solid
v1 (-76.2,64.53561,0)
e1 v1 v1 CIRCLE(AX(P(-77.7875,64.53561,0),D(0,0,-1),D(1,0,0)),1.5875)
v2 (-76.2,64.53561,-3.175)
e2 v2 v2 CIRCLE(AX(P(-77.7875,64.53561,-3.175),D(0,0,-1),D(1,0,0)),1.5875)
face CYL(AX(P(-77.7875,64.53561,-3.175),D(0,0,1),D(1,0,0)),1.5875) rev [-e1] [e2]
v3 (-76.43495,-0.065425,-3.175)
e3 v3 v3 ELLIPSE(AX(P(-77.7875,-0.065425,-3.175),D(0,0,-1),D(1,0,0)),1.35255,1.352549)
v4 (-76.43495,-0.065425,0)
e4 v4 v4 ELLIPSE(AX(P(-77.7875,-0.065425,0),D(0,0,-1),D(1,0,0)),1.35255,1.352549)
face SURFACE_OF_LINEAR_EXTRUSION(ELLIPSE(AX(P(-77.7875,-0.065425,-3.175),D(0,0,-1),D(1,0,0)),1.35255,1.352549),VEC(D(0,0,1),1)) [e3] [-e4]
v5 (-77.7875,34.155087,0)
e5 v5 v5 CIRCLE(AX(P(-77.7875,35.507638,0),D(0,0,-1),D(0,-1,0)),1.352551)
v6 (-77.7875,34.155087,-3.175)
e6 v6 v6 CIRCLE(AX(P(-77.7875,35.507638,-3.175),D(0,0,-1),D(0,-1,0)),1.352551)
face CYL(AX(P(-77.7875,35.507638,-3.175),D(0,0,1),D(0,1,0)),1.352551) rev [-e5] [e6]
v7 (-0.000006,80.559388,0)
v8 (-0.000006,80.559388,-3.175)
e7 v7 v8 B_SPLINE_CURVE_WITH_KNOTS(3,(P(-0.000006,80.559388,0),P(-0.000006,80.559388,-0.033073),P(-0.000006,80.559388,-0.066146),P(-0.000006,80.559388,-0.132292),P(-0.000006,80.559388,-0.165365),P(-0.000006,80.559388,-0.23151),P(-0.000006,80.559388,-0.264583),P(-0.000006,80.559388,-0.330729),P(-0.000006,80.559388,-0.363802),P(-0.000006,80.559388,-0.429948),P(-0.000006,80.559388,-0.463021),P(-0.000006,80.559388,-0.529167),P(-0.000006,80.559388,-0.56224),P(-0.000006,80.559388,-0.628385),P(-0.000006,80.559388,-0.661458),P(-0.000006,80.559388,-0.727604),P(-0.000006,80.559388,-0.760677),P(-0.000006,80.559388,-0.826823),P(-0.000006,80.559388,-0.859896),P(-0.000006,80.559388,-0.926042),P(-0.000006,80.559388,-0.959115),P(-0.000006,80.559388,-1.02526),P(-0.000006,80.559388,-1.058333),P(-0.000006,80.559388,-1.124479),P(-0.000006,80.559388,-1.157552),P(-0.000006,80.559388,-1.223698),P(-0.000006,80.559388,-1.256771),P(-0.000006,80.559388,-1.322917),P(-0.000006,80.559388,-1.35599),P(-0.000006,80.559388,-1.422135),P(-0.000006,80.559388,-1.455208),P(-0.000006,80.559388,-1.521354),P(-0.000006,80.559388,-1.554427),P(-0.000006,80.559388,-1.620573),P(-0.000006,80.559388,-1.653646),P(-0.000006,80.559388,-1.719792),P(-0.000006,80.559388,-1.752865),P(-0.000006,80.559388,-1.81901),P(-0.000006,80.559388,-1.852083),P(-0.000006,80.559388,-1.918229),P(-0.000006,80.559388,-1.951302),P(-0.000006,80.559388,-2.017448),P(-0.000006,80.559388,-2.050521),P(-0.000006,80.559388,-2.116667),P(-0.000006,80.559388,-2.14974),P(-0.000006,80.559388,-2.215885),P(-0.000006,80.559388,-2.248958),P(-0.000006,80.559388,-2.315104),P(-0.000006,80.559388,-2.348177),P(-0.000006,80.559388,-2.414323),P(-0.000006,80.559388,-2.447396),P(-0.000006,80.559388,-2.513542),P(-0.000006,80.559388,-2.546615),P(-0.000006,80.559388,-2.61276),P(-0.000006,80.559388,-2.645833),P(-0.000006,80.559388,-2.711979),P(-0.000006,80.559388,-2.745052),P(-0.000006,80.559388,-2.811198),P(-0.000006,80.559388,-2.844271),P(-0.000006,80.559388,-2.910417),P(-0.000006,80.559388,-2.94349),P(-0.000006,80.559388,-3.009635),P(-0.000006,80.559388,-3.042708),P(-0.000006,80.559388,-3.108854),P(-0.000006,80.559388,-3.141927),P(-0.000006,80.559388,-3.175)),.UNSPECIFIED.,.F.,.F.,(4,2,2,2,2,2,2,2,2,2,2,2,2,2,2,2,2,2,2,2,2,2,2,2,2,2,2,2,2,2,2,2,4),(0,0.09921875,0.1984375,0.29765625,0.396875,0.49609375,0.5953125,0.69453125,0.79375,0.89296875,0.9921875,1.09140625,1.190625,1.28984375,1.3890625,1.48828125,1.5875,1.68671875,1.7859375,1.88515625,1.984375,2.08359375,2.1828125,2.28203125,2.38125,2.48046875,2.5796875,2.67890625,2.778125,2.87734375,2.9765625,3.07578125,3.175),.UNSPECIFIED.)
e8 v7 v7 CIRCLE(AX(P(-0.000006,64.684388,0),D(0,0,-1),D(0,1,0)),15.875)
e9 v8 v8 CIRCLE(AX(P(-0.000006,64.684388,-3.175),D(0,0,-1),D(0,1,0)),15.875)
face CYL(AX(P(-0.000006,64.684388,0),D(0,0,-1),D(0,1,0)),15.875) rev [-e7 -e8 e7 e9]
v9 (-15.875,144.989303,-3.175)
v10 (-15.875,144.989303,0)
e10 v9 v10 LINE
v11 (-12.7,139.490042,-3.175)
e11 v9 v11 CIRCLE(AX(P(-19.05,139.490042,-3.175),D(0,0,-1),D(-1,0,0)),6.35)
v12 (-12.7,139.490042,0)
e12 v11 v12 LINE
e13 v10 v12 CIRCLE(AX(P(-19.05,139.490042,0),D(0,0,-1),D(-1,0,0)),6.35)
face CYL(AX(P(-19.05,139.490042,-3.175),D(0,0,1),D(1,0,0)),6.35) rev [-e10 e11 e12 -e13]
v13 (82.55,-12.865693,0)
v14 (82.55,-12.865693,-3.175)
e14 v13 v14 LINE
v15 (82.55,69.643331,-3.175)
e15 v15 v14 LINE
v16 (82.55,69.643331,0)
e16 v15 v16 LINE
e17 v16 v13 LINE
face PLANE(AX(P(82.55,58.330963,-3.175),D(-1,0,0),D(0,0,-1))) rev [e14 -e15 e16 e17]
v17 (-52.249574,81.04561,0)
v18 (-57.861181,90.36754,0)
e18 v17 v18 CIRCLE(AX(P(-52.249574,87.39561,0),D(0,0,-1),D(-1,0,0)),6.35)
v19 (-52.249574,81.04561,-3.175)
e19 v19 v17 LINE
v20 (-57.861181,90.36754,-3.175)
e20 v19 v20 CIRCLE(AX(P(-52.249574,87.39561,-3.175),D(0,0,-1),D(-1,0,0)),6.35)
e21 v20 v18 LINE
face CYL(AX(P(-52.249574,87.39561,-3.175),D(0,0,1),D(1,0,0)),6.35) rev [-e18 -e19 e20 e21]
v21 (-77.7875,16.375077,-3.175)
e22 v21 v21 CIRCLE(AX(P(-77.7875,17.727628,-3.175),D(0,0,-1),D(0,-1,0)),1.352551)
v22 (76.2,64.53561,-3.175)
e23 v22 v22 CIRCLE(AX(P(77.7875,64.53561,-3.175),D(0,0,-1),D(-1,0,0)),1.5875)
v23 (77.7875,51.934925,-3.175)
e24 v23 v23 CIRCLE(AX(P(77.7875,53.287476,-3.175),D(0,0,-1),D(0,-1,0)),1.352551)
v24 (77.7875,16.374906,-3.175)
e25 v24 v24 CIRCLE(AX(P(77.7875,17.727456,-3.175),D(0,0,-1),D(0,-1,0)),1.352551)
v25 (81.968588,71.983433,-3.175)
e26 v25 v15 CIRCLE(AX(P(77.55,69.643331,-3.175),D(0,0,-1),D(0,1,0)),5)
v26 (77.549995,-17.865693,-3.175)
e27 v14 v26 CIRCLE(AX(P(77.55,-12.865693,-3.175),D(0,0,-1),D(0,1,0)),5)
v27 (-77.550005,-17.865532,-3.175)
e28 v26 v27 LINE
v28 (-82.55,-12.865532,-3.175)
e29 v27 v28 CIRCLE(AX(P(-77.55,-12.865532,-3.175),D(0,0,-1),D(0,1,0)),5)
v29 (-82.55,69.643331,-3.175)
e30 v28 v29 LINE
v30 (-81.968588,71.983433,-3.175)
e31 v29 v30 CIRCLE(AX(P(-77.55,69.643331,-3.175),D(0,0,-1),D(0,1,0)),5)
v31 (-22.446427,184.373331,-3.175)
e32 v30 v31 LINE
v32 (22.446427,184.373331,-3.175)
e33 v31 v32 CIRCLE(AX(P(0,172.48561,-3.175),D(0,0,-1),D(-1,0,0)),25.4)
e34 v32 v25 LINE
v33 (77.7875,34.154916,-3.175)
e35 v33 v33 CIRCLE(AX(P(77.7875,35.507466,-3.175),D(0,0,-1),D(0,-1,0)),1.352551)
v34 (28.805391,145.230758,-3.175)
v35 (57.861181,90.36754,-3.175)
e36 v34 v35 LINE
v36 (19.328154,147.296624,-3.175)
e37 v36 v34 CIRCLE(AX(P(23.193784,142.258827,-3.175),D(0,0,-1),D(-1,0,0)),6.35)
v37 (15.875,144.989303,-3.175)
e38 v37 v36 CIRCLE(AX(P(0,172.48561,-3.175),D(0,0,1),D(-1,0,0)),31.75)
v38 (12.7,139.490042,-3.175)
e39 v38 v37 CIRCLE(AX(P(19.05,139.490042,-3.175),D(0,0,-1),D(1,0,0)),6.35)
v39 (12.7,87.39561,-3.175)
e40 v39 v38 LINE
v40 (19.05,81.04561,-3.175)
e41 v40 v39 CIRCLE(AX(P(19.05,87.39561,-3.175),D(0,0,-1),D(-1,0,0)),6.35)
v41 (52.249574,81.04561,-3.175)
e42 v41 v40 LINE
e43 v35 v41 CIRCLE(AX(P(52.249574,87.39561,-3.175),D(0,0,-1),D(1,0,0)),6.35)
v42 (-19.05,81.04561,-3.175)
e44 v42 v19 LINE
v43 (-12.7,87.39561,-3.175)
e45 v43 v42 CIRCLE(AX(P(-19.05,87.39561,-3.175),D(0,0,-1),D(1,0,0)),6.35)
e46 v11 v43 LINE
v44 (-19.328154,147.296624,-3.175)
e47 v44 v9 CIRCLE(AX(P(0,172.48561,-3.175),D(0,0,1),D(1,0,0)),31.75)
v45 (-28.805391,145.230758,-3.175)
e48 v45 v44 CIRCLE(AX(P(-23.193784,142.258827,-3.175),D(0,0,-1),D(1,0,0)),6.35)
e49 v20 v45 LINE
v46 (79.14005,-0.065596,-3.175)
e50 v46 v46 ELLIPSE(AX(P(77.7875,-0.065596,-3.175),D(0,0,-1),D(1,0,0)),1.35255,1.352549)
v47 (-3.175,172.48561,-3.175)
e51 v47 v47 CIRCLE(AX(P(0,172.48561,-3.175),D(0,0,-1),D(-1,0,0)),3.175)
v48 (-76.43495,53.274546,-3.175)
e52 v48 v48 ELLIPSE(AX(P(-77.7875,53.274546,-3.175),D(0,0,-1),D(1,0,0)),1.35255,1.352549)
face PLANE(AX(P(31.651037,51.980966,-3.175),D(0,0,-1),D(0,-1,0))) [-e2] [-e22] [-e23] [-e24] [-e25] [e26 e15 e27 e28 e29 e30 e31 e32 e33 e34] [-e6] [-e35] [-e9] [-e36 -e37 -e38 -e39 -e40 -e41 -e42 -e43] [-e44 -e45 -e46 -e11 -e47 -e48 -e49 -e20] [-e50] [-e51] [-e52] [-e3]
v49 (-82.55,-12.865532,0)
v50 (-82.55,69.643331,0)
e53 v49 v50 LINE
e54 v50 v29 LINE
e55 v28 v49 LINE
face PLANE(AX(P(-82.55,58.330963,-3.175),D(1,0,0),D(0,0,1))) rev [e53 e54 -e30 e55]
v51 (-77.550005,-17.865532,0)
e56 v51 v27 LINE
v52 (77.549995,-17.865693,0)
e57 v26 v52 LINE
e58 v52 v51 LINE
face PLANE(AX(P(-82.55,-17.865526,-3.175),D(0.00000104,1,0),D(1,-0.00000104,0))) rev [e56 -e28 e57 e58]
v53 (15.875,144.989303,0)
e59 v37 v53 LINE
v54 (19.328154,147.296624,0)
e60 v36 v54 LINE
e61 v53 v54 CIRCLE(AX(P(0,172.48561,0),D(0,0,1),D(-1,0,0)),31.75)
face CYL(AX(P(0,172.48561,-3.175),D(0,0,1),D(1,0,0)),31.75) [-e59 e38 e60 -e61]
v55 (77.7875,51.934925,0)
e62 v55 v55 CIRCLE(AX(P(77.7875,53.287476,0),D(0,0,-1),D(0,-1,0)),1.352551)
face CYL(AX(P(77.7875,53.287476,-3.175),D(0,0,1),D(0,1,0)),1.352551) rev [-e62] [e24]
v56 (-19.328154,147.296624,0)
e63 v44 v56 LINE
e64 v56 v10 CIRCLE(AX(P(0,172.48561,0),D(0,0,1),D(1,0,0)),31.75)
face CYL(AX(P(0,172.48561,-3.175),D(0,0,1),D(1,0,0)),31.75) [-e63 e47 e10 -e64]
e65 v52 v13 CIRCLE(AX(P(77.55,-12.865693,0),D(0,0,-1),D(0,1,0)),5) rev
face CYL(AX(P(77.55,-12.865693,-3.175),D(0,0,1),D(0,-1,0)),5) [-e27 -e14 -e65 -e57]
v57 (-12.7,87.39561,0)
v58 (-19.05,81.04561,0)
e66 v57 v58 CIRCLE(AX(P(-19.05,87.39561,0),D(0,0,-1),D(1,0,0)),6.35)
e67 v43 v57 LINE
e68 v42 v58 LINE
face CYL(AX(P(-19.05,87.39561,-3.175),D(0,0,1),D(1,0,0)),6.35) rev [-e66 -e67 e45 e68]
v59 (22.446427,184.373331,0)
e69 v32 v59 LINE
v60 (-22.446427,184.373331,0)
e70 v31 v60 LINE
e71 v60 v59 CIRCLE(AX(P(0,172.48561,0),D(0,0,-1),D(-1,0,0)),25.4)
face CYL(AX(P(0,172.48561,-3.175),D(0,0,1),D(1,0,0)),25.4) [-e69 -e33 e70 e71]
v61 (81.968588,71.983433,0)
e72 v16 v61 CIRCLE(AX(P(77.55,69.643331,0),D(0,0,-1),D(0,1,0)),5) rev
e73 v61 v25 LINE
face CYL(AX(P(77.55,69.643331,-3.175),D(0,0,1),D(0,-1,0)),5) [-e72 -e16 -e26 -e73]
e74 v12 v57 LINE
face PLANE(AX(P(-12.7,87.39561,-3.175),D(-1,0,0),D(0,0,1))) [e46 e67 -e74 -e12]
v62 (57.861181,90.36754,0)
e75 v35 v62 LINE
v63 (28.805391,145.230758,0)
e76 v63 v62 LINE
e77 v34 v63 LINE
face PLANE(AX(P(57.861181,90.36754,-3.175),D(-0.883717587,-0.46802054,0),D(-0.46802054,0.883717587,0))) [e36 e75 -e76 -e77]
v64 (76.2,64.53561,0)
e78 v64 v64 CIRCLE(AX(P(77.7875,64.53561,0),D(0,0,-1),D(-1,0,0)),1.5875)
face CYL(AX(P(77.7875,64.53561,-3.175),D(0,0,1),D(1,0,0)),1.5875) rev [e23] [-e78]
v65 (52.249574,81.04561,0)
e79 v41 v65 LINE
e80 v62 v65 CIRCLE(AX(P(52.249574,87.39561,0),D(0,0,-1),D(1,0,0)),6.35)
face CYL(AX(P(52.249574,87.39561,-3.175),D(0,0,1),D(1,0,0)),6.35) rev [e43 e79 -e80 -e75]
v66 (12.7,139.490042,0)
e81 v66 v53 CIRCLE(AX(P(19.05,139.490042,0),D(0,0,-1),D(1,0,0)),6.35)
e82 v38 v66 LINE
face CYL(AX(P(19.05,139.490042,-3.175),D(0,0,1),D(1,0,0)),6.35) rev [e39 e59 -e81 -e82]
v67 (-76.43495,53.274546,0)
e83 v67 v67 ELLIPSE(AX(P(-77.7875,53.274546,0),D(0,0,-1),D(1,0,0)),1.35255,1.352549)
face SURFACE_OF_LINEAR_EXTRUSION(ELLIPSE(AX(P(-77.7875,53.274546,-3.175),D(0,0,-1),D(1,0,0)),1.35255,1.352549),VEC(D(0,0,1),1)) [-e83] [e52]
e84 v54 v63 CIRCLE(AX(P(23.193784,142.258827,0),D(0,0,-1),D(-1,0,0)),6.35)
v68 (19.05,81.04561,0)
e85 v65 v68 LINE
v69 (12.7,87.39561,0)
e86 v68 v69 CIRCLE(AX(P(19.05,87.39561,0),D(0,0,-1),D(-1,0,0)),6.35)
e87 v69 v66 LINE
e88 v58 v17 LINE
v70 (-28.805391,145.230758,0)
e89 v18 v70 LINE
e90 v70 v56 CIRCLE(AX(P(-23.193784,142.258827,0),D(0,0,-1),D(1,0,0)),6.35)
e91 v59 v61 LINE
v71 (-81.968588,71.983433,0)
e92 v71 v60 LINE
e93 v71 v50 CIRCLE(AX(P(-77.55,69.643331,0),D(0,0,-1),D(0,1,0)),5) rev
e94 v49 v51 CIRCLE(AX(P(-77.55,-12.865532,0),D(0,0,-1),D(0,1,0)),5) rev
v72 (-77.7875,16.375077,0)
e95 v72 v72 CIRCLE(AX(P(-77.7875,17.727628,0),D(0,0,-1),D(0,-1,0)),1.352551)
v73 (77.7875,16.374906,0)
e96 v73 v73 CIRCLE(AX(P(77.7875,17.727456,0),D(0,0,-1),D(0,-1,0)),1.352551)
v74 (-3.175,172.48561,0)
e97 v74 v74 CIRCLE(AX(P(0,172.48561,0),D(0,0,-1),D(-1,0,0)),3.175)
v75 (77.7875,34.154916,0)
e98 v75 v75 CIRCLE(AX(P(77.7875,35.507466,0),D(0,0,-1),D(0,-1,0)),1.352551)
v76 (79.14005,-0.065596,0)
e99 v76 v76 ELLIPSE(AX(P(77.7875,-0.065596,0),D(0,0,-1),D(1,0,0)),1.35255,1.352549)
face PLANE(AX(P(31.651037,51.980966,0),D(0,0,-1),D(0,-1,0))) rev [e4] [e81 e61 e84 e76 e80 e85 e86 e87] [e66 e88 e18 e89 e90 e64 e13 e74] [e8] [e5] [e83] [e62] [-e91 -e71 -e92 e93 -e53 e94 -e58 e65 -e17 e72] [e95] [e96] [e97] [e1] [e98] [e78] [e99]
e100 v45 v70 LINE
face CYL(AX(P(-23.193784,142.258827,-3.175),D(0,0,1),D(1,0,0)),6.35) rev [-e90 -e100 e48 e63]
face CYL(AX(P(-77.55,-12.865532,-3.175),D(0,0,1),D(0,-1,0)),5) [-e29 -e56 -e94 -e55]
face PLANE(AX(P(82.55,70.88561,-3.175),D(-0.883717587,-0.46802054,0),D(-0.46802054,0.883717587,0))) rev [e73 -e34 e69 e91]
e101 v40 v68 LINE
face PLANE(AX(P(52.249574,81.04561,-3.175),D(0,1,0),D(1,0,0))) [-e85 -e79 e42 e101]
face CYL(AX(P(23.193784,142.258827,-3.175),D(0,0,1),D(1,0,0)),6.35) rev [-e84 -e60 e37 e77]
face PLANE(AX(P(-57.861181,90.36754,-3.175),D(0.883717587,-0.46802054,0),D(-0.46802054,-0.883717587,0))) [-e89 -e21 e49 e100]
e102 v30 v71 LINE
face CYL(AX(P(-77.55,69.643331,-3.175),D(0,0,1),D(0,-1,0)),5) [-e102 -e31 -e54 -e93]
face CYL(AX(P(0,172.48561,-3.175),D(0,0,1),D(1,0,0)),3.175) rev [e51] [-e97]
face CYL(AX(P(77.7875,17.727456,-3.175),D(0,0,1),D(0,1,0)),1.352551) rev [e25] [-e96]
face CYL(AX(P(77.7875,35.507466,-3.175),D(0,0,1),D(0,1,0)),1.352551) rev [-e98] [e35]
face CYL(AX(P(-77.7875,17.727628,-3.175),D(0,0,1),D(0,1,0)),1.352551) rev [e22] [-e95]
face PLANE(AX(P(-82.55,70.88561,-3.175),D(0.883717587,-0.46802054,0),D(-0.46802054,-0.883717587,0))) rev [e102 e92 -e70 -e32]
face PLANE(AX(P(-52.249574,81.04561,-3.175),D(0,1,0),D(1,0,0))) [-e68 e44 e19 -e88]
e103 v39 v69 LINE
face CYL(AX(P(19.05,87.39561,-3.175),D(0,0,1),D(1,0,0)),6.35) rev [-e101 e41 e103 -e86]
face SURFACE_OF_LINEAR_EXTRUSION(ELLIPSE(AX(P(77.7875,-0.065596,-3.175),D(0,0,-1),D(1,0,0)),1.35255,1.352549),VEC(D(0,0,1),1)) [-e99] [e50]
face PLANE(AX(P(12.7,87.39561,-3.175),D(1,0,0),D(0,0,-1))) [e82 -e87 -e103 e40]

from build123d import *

# Parameters (mm, degrees)
AM_1014_TI_PLATE_BOTTOM_1_AM_0001_ARTEME_START = -3.175
AM_1014_TI_PLATE_BOTTOM_1_AM_0001_AR_2_R       = 1.352550752
AM_1014_TI_PLATE_BOTTOM_1_AM_0001_AR_2_R_2     = 1.5875
AM_1014_TI_PLATE_BOTTOM_1_AM_0001_AR_2_R_3     = 3.175
AM_1014_TI_PLATE_BOTTOM_1_AM_0001_ARTEME_DEPTH = 3.175
BOSS_EXTRUDE1_DEPTH                            = 3.175
FILLET1_R                                      = 5
FILLET2_R                                      = 5
SKETCH3_R                                      = 15.875
CUT_EXTRUDE1_DEPTH                             = 215.437164916


# Read off the part's stored shape, not the designer's step: AM_1014_TI_PLATE_BOTTOM<1>@AM_0001_ARTEMECH
with BuildPart() as part:
    # AM_1014_TI_PLATE_BOTTOM_1_AM_0001_AR 2 → AM_1014_TI_PLATE_BOTTOM<1>@AM_0001_ARTEMECH (new body)
    with BuildSketch(Plane.XY.offset(AM_1014_TI_PLATE_BOTTOM_1_AM_0001_ARTEME_START)):
        with BuildLine():
            Line((82.55, -17.865698052), (82.55, 70.885609673))
            Line((82.55, 70.885609673), (22.446426721, 184.373331383))
            ThreePointArc((22.446426721, 184.373331383), (0, 197.885609673), (-22.446426721, 184.373331383))
            Line((-22.446426721, 184.373331383), (-82.55, 70.885609673))
            Line((-82.55, 70.885609673), (-82.55, -17.865526365))
            Line((-82.55, -17.865526365), (82.55, -17.865698052))
        make_face()
        with BuildLine():
            add(Edge.make_bspline(
                [(-76.43495, -0.065424583), (-76.43495, -2.408108601), (-78.463775, -1.236766592), (-80.4926, -0.065424583), (-78.463775, 1.105917426), (-76.43495, 2.277259435), (-76.43495, -0.065424583)],
                knots=[0, 0, 0, 2.094395102, 2.094395102, 4.188790205, 4.188790205, 6.283185307, 6.283185307, 6.283185307], degree=2, weights=[1, 0.5, 1, 0.5, 1, 0.5, 1]))
        make_face(mode=Mode.SUBTRACT)
        with Locations((-77.7875, 17.727628115)):
            Circle(AM_1014_TI_PLATE_BOTTOM_1_AM_0001_AR_2_R, mode=Mode.SUBTRACT)
        with Locations((-77.7875, 35.507637995)):
            Circle(AM_1014_TI_PLATE_BOTTOM_1_AM_0001_AR_2_R, mode=Mode.SUBTRACT)
        with BuildLine():
            add(Edge.make_bspline(
                [(-76.43495, 53.274545779), (-76.43495, 50.931861761), (-78.463775, 52.10320377), (-80.4926, 53.274545779), (-78.463775, 54.445887788), (-76.43495, 55.617229797), (-76.43495, 53.274545779)],
                knots=[0, 0, 0, 2.094395102, 2.094395102, 4.188790205, 4.188790205, 6.283185307, 6.283185307, 6.283185307], degree=2, weights=[1, 0.5, 1, 0.5, 1, 0.5, 1]))
        make_face(mode=Mode.SUBTRACT)
        with Locations((-77.7875, 64.535609673)):
            Circle(AM_1014_TI_PLATE_BOTTOM_1_AM_0001_AR_2_R_2, mode=Mode.SUBTRACT)
        with BuildLine():
            Line((-25.498963051, 42.455971326), (-25.498963051, 51.980966033))
            add(Edge.make_bspline(
                [(-27.992064204, 57.025448466), (-25.498963051, 55.119281003), (-25.498963051, 51.980966033)],
                knots=[5.365154464, 5.365154464, 5.365154464, 6.283185307, 6.283185307, 6.283185307], degree=2, weights=[1, 0.896489165, 1]))
            ThreePointArc((-27.992064204, 57.025448466), (-26.013795844, 54.758623994), (-25.301036949, 51.835609673))
            Line((-25.301036949, 51.835609673), (-25.301036949, 42.310609673))
            ThreePointArc((-25.301036949, 42.310609673), (-24.985888452, 40.931525054), (-24.103005841, 39.826214575))
            add(Edge.make_bspline(
                [(-25.498963051, 42.455971326), (-25.49896305, 40.770584495), (-24.103005841, 39.826214575)],
                knots=[0, 0, 0, 0.976013915, 0.976013915, 0.976013915], degree=2, weights=[1, 0.883269083, 1]))
        make_face(mode=Mode.SUBTRACT)
        with Locations((-21.166666667, 47.762966307)):
            Circle(AM_1014_TI_PLATE_BOTTOM_1_AM_0001_AR_2_R_2, mode=Mode.SUBTRACT)
        with BuildLine():
            ThreePointArc((-11.2, 77.174125728), (-9.5, 78.874125728), (-7.8, 77.174125728))
            Line((-7.8, 77.174125728), (-7.8, 64.474125728))
            ThreePointArc((-7.8, 64.474125728), (-9.5, 62.774125728), (-11.2, 64.474125728))
            Line((-11.2, 64.474125728), (-11.2, 77.174125728))
        make_face(mode=Mode.SUBTRACT)
        with BuildLine():
            ThreePointArc((-1.7, 85.174125728), (0, 86.874125728), (1.7, 85.174125728))
            Line((1.7, 85.174125728), (1.7, 56.474125728))
            ThreePointArc((1.7, 56.474125728), (0, 54.774125728), (-1.7, 56.474125728))
            Line((-1.7, 56.474125728), (-1.7, 85.174125728))
        make_face(mode=Mode.SUBTRACT)
        with BuildLine():
            add(Edge.make_bspline(
                [(79.14005, -0.065596271), (79.14005, -2.408280289), (77.111225, -1.23693828), (75.0824, -0.065596271), (77.111225, 1.105745738), (79.14005, 2.277087747), (79.14005, -0.065596271)],
                knots=[0, 0, 0, 2.094395102, 2.094395102, 4.188790205, 4.188790205, 6.283185307, 6.283185307, 6.283185307], degree=2, weights=[1, 0.5, 1, 0.5, 1, 0.5, 1]))
        make_face(mode=Mode.SUBTRACT)
        with Locations((77.7875, 17.727456427)):
            Circle(AM_1014_TI_PLATE_BOTTOM_1_AM_0001_AR_2_R, mode=Mode.SUBTRACT)
        with Locations((77.7875, 35.507466307)):
            Circle(AM_1014_TI_PLATE_BOTTOM_1_AM_0001_AR_2_R, mode=Mode.SUBTRACT)
        with Locations((21.166666667, 47.762966307)):
            Circle(AM_1014_TI_PLATE_BOTTOM_1_AM_0001_AR_2_R_2, mode=Mode.SUBTRACT)
        with BuildLine():
            ThreePointArc((7.8, 77.174125728), (9.5, 78.874125728), (11.2, 77.174125728))
            Line((11.2, 77.174125728), (11.2, 64.474125728))
            ThreePointArc((11.2, 64.474125728), (9.5, 62.774125728), (7.8, 64.474125728))
            Line((7.8, 64.474125728), (7.8, 77.174125728))
        make_face(mode=Mode.SUBTRACT)
        with Locations((77.7875, 53.287476186)):
            Circle(AM_1014_TI_PLATE_BOTTOM_1_AM_0001_AR_2_R, mode=Mode.SUBTRACT)
        with Locations((77.7875, 64.535609673)):
            Circle(AM_1014_TI_PLATE_BOTTOM_1_AM_0001_AR_2_R_2, mode=Mode.SUBTRACT)
        with BuildLine():
            ThreePointArc((-28.80539088, 145.230757697), (-24.546211379, 148.463135508), (-19.3281535, 147.296624336))
            ThreePointArc((-19.3281535, 147.296624336), (-17.639343437, 146.086441824), (-15.875, 144.989303103))
            ThreePointArc((-15.875, 144.989303103), (-13.550738686, 142.665041789), (-12.7, 139.490041789))
            Line((-12.7, 139.490041789), (-12.7, 87.395609673))
            ThreePointArc((-12.7, 87.395609673), (-14.559871939, 82.905481612), (-19.05, 81.045609673))
            Line((-19.05, 81.045609673), (-52.249574284, 81.045609673))
            ThreePointArc((-52.249574284, 81.045609673), (-57.689898641, 84.120648468), (-57.861180964, 90.3675401))
            Line((-57.861180964, 90.3675401), (-28.80539088, 145.230757697))
        make_face(mode=Mode.SUBTRACT)
        with Locations((0, 172.485609673)):
            Circle(AM_1014_TI_PLATE_BOTTOM_1_AM_0001_AR_2_R_3, mode=Mode.SUBTRACT)
        with BuildLine():
            ThreePointArc((12.7, 139.490041789), (13.550738686, 142.665041789), (15.875, 144.989303103))
            ThreePointArc((15.875, 144.989303103), (17.639343437, 146.086441824), (19.3281535, 147.296624336))
            ThreePointArc((19.3281535, 147.296624336), (24.546211379, 148.463135508), (28.80539088, 145.230757697))
            Line((28.80539088, 145.230757697), (57.861180964, 90.3675401))
            ThreePointArc((57.861180964, 90.3675401), (57.689898641, 84.120648468), (52.249574284, 81.045609673))
            Line((52.249574284, 81.045609673), (19.05, 81.045609673))
            ThreePointArc((19.05, 81.045609673), (14.559871939, 82.905481612), (12.7, 87.395609673))
            Line((12.7, 87.395609673), (12.7, 139.490041789))
        make_face(mode=Mode.SUBTRACT)
    extrude(amount=AM_1014_TI_PLATE_BOTTOM_1_AM_0001_ARTEME_DEPTH)

    # Sketch2 → Boss-Extrude1 (add)
    with BuildSketch(Plane.XY):
        Polygon((-32.469776479, 59.073916865), (-26.167336903, 34.866819401), (-21.798600378, 37.659946031), (-22.638250573, 40.884966099), (-23.982968641, 44.105622871), (-23.310609607, 52.84309592), (-24.42605214, 57.127409286), (-28.115838313, 59.292776758), align=None)
        Polygon((-6.053335336, 87.881784973), (-14.736690513, 77.155287401), (-14.736690513, 57.127409286), (-2.605532544, 48.423597474), (16.810044844, 51.617454016), (16.810044844, 65.151825831), (13.228821015, 78.943036996), (9.014839826, 83.667803784), (0, 90.965531262), align=None)
        Polygon((-21.42787696, 50.494433374), (-22.918845174, 48.423597474), (-22.918845174, 45.648786681), (-20.375616181, 43.817703114), (14.824315675, 42.266139704), (26.595333202, 42.266139704), (26.595333202, 48.423597474), (23.719107345, 50.494433374), (18.474028772, 49.64052578), (-6.053335336, 47.698917024), align=None)
    extrude(amount=-BOSS_EXTRUDE1_DEPTH)

    # Fillet1
    fillet1_edges = [part.edges().sort_by_distance(p)[0] for p in [
        (-82.55, -17.865526365, -1.5875),
        (82.55, -17.865698052, -1.5875),
    ]]
    fillet(fillet1_edges, radius=FILLET1_R)

    # Fillet2
    fillet2_edges = [part.edges().sort_by_distance(p)[0] for p in [
        (82.55, 70.885609673, -1.5875),
        (-82.55, 70.885609673, -1.5875),
    ]]
    fillet(fillet2_edges, radius=FILLET2_R)

    # Sketch3 → Cut-Extrude1 (cut, through all)
    with BuildSketch(Plane(origin=(0, 0, -3.175), x_dir=(-1, 0, 0), z_dir=(0, 0, -1))):
        with Locations(Location((6.469e-06, 64.684387792, 0), (0, 0, 90))):
            Circle(SKETCH3_R)
    extrude(amount=-CUT_EXTRUDE1_DEPTH, mode=Mode.SUBTRACT)


solid = part.part
